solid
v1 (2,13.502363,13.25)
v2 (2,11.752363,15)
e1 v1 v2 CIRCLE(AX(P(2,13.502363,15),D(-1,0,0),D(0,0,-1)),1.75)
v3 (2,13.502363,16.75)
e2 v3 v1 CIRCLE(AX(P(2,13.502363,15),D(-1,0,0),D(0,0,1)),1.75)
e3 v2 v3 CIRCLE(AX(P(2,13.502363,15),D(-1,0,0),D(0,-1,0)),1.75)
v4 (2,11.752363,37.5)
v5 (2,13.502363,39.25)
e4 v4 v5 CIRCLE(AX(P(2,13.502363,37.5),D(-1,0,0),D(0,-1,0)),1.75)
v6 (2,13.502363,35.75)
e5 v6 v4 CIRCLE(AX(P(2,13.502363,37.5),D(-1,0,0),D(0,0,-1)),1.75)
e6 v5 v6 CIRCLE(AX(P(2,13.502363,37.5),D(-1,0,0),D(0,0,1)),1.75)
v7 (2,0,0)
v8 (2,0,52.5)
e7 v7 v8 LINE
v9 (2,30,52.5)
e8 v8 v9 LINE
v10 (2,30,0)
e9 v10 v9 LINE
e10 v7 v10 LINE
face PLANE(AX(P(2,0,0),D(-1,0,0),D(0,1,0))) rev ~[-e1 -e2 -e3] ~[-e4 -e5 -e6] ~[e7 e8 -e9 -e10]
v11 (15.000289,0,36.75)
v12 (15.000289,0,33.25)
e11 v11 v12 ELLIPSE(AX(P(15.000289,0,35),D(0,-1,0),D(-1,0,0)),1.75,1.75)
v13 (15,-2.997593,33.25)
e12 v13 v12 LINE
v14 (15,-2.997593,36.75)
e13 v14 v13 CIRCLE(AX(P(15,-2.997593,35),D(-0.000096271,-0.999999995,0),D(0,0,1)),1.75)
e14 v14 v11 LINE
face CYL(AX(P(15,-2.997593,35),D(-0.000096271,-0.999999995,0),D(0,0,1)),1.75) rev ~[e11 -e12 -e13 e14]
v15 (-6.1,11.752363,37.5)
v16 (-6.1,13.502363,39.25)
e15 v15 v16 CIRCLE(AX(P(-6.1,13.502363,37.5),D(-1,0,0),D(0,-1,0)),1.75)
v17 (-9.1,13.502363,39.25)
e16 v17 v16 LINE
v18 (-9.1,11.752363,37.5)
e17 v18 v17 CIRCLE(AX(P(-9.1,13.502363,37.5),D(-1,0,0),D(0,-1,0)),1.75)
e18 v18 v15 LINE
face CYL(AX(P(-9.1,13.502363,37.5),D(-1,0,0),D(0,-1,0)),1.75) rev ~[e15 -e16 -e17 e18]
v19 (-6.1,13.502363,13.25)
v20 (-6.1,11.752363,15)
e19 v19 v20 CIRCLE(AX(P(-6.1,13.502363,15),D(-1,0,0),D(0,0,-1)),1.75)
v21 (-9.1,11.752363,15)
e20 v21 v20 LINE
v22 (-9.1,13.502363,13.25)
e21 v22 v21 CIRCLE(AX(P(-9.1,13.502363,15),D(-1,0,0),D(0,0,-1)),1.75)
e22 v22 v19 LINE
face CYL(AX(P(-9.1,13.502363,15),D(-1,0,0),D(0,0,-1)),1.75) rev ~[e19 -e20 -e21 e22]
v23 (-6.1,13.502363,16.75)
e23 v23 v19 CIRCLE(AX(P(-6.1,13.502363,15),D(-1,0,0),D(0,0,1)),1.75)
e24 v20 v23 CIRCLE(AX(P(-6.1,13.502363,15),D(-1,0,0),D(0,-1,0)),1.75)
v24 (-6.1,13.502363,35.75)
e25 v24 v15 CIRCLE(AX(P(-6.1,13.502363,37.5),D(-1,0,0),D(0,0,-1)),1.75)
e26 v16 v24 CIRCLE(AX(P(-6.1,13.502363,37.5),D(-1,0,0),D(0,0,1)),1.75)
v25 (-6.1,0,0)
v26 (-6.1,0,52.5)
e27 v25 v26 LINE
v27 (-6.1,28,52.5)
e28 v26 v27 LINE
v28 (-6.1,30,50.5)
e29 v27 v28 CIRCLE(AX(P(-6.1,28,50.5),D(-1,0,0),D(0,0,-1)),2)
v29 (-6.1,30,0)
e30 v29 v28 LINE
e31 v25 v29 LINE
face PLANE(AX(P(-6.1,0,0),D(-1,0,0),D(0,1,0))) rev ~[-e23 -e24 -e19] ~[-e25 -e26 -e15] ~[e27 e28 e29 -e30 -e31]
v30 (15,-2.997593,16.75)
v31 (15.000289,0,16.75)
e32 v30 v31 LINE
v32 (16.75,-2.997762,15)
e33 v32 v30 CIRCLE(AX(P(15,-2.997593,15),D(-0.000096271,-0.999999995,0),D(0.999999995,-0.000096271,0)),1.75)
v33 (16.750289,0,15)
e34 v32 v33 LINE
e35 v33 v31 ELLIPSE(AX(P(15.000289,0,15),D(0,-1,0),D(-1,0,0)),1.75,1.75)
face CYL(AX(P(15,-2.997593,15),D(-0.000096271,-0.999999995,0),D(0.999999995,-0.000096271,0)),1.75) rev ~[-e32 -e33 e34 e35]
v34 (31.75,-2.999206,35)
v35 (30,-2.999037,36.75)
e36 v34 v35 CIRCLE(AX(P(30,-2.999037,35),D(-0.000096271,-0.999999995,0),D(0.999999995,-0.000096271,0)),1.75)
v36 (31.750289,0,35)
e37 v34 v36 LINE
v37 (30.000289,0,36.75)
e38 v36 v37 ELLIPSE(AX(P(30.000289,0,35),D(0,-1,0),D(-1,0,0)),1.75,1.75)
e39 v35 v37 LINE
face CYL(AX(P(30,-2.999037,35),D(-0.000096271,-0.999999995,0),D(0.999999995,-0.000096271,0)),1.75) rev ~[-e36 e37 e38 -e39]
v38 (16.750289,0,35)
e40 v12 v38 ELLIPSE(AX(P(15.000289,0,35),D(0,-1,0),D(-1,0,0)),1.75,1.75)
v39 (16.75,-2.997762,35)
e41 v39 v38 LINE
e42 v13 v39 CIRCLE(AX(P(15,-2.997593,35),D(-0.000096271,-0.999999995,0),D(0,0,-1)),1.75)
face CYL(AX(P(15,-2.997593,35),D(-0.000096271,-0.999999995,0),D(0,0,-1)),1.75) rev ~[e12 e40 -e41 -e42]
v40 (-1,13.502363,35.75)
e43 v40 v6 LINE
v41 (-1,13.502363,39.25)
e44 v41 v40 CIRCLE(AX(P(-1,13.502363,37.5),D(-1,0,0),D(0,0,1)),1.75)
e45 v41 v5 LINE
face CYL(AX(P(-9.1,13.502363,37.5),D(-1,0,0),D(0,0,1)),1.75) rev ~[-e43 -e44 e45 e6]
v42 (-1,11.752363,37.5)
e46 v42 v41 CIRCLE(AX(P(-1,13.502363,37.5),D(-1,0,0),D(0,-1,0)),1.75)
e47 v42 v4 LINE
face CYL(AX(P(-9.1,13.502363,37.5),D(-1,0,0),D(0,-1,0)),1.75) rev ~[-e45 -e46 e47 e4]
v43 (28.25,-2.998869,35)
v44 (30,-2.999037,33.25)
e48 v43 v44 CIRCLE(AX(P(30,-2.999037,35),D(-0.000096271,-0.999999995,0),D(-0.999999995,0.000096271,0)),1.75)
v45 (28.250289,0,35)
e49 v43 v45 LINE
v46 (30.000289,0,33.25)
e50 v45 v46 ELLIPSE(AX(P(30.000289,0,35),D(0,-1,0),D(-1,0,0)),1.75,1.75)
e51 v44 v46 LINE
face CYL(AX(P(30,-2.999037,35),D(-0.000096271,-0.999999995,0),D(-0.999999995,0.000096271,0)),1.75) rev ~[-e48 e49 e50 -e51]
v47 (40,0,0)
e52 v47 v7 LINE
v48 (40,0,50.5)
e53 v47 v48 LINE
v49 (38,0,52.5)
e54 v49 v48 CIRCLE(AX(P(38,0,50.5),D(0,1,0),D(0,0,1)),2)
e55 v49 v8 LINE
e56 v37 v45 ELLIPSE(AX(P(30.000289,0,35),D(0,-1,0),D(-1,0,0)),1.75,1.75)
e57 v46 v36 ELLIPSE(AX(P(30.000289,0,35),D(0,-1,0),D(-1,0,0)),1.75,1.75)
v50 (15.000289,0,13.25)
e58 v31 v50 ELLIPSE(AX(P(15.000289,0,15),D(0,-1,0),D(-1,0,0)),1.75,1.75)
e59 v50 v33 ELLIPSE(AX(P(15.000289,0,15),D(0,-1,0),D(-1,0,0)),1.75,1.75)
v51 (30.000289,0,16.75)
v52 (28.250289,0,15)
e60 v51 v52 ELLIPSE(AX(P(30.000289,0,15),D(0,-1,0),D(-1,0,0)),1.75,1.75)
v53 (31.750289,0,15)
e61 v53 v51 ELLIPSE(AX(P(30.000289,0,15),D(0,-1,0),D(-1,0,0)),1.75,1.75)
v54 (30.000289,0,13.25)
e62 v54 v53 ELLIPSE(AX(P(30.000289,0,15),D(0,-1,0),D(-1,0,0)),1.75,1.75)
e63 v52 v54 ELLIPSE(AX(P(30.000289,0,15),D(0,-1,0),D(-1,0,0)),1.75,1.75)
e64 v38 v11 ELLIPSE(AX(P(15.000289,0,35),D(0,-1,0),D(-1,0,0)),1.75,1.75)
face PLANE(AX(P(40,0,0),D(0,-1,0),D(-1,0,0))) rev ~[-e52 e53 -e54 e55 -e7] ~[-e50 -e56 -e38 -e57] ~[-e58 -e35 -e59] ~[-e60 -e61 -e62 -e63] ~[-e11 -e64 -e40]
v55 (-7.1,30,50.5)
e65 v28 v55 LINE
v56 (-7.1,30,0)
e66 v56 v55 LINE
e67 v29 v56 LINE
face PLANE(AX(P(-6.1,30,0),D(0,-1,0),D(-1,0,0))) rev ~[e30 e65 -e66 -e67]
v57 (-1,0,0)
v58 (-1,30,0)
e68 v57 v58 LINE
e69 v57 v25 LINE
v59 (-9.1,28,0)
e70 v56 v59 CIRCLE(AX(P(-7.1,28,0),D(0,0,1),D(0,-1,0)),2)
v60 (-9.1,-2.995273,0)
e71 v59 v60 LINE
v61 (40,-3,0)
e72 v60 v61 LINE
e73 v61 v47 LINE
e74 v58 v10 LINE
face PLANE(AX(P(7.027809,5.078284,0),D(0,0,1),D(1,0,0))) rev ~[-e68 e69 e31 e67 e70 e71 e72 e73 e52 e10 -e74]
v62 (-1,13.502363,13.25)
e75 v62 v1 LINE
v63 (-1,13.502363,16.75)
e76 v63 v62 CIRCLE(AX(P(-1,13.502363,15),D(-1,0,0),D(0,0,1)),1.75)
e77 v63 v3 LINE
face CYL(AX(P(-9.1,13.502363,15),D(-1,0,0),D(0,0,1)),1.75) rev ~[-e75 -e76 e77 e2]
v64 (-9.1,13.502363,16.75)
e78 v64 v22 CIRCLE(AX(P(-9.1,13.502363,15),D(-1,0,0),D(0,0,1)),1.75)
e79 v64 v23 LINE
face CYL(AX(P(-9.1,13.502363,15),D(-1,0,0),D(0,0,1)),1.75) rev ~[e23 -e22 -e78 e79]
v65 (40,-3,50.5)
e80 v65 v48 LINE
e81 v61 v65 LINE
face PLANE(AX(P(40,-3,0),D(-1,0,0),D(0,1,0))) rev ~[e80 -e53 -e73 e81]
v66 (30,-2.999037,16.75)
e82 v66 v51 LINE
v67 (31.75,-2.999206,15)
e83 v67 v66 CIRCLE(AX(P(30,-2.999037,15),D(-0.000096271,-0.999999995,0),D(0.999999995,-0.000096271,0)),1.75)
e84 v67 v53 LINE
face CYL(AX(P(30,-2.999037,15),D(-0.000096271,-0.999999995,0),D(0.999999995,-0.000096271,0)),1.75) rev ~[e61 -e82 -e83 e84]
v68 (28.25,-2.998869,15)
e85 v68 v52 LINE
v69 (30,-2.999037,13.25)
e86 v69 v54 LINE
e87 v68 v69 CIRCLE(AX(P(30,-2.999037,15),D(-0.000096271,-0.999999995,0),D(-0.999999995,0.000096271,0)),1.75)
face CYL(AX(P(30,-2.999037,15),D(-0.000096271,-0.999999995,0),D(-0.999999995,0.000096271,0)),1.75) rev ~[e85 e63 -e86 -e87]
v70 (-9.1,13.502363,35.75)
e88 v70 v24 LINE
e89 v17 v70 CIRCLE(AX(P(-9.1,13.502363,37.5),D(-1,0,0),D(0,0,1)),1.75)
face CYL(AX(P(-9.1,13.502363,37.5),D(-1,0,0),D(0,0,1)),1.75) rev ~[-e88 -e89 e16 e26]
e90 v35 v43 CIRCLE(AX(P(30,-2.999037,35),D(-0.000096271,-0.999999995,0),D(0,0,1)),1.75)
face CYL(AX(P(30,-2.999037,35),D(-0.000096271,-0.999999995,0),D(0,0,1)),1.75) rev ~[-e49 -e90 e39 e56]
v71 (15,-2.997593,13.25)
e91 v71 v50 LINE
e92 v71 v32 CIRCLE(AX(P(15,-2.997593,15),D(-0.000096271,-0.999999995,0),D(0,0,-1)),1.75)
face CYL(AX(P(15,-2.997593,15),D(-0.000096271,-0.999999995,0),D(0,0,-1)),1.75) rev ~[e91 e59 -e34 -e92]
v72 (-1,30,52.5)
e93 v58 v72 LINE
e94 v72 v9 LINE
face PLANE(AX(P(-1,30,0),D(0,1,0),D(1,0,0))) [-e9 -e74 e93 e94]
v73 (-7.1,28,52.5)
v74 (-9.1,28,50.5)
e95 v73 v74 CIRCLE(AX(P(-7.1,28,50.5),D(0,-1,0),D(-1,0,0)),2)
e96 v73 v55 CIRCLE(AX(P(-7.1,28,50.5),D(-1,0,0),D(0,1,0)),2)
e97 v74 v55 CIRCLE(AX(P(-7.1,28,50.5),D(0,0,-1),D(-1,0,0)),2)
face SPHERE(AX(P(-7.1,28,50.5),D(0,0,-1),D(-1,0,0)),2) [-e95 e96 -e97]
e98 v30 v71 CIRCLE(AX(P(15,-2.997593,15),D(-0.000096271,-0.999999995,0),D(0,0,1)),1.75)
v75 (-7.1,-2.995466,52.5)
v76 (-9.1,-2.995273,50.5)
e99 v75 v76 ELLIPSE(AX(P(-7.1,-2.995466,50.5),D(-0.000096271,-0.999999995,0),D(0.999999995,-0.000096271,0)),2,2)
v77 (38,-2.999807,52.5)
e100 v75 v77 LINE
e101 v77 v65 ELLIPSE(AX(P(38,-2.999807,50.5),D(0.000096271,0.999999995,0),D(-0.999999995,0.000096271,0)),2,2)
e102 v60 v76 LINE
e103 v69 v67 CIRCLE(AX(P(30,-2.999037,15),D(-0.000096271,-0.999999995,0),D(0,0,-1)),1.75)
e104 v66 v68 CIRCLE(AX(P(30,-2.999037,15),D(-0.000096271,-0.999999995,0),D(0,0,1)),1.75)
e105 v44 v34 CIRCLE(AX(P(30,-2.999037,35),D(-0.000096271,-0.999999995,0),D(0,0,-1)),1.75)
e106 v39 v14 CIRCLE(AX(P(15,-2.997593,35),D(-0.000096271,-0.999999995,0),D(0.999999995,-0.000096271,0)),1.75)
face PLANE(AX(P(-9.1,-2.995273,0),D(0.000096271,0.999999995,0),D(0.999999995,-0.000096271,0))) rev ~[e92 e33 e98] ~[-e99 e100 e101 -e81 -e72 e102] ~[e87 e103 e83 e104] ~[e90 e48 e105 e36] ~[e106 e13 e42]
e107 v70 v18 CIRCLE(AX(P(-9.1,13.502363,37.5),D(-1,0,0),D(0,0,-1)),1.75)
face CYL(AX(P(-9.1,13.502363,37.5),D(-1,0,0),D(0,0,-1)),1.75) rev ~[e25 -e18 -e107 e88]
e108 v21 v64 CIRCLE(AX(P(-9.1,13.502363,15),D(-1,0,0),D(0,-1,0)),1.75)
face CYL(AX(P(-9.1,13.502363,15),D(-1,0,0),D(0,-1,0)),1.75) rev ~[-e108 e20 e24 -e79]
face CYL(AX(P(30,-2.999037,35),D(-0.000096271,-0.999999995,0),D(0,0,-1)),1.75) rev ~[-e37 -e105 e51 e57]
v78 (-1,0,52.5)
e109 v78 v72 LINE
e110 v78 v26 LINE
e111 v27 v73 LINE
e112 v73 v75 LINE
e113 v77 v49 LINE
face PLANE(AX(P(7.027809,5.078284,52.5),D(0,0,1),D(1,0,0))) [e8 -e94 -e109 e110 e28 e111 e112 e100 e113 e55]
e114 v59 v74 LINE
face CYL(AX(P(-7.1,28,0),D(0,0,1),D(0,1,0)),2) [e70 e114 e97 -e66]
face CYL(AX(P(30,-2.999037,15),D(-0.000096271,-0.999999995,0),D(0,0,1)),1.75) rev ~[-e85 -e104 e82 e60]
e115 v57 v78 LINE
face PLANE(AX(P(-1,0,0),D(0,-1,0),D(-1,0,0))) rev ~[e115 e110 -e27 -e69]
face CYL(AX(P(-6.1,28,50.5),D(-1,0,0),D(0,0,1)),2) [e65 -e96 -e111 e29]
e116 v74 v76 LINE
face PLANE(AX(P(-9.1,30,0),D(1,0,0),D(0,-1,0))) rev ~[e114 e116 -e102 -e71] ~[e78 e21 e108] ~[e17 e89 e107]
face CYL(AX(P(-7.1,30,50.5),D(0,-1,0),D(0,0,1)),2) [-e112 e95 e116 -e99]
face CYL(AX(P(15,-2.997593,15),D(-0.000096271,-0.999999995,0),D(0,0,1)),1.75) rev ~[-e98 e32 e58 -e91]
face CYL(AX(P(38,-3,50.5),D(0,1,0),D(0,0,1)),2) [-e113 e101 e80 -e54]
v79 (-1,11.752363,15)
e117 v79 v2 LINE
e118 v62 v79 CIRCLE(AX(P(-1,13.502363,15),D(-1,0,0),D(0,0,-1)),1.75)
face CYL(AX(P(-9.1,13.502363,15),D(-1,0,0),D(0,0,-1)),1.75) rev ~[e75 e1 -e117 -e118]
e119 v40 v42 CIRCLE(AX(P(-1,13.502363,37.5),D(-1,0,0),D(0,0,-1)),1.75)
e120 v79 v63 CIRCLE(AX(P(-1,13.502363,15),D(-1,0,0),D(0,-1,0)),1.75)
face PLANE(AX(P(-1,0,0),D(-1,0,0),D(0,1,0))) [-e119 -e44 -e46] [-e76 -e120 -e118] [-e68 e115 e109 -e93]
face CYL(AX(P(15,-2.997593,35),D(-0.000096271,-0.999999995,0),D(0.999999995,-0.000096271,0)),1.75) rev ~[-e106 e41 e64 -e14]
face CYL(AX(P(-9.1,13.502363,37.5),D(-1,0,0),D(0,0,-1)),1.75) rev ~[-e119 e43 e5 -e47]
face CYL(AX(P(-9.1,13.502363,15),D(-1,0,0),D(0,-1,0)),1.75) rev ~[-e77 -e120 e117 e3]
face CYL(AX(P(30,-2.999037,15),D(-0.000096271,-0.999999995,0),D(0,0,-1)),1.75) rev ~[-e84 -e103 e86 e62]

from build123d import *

# Parameters (mm, degrees)
F0_W     = 3
F0_H     = 30
F1_DEPTH = 52.5
F3_DEPTH = 25
F4_R     = 2
F6_DEPTH = 25


# Not quite as in the source:
# - a feature names something its author has since deleted; it is built from what else it names


with BuildPart() as f1:
    # F0 (on Top) → F1 (new body)
    with BuildSketch(Plane.XY):
        Polygon((2, 0), (-1, 0), (-6.1, 0), (-6.1, 30), (-9.1, 30), (-9.1, -2.9952730983), (40, -3), (40, 0), align=None)
        with Locations((0.5, 15)):
            Rectangle(F0_W, F0_H)
    extrude(amount=F1_DEPTH)

    # F2 (on face) → F3 (cut)
    with BuildSketch(Plane(origin=(-9.1, 0, 0), x_dir=(0, -1, 0), z_dir=(-1, 0, 0))):
        with BuildLine():
            Line((-13.5023634508, 37.5), (-13.5023634508, 39.25))
            ThreePointArc((-13.5023634508, 39.25), (-15.2523634508, 37.5), (-13.5023634508, 35.75))
            Line((-13.5023634508, 35.75), (-13.5023634508, 37.5))
        make_face()
        with BuildLine():
            ThreePointArc((-11.7523634508, 37.5), (-12.2649265837, 38.7374368671), (-13.5023634508, 39.25))
            Line((-13.5023634508, 39.25), (-13.5023634508, 37.5))
            Line((-13.5023634508, 37.5), (-13.5023634508, 35.75))
            ThreePointArc((-13.5023634508, 35.75), (-12.2649265837, 36.2625631329), (-11.7523634508, 37.5))
        make_face()
        with BuildLine():
            Line((-13.5023634508, 15), (-13.5023634508, 13.25))
            ThreePointArc((-13.5023634508, 13.25), (-12.2649265837, 13.7625631329), (-11.7523634508, 15))
            ThreePointArc((-11.7523634508, 15), (-12.2649265837, 16.2374368671), (-13.5023634508, 16.75))
            Line((-13.5023634508, 16.75), (-13.5023634508, 15))
        make_face()
        with BuildLine():
            ThreePointArc((-13.5023634508, 16.75), (-15.2523634508, 15), (-13.5023634508, 13.25))
            Line((-13.5023634508, 13.25), (-13.5023634508, 15))
            Line((-13.5023634508, 15), (-13.5023634508, 16.75))
        make_face()
    extrude(amount=-F3_DEPTH, mode=Mode.SUBTRACT)

    # F4
    f4_edges = [f1.edges().sort_by_distance(p)[0] for p in [
        (40, -1.5, 52.5),
        (-9.1, 30, 26.25),
        (-9.1, 13.502363, 52.5),
        (-7.6, 30, 52.5),
    ]]
    fillet(f4_edges, radius=F4_R)

    # F5 (on face) → F6 (cut)
    with BuildSketch(Plane(origin=(-0.000288442, -2.9961491359, 0), x_dir=(0.9999999954, -9.62709e-05, 0), z_dir=(-9.62709e-05, -0.9999999954, 0))):
        with BuildLine():
            Line((15.0002886274, 35), (15.0002886274, 33.25))
            ThreePointArc((15.0002886274, 33.25), (16.2377254944, 33.7625631329), (16.7502886274, 35))
            Line((16.7502886274, 35), (15.0002886274, 35))
        make_face()
        with BuildLine():
            ThreePointArc((15.0002886274, 36.75), (13.2502886274, 35), (15.0002886274, 33.25))
            Line((15.0002886274, 33.25), (15.0002886274, 35))
            Line((15.0002886274, 35), (15.0002886274, 36.75))
        make_face()
        with BuildLine():
            Line((15.0002886274, 36.75), (15.0002886274, 35))
            Line((15.0002886274, 35), (16.7502886274, 35))
            ThreePointArc((16.7502886274, 35), (16.2377254944, 36.2374368671), (15.0002886274, 36.75))
        make_face()
        with BuildLine():
            Line((30.0002886274, 35), (31.7502886274, 35))
            ThreePointArc((31.7502886274, 35), (31.2377254944, 36.2374368671), (30.0002886274, 36.75))
            Line((30.0002886274, 36.75), (30.0002886274, 35))
        make_face()
        with BuildLine():
            Line((28.2502886274, 35), (30.0002886274, 35))
            Line((30.0002886274, 35), (30.0002886274, 36.75))
            ThreePointArc((30.0002886274, 36.75), (28.7628517603, 36.2374368671), (28.2502886274, 35))
        make_face()
        with BuildLine():
            Line((30.0002886274, 33.25), (30.0002886274, 35))
            Line((30.0002886274, 35), (28.2502886274, 35))
            ThreePointArc((28.2502886274, 35), (28.7628517603, 33.7625631329), (30.0002886274, 33.25))
        make_face()
        with BuildLine():
            ThreePointArc((30.0002886274, 33.25), (31.2377254944, 33.7625631329), (31.7502886274, 35))
            Line((31.7502886274, 35), (30.0002886274, 35))
            Line((30.0002886274, 35), (30.0002886274, 33.25))
        make_face()
        with BuildLine():
            Line((30.0002886274, 15), (31.7502886274, 15))
            ThreePointArc((31.7502886274, 15), (31.2377254944, 16.2374368671), (30.0002886274, 16.75))
            Line((30.0002886274, 16.75), (30.0002886274, 15))
        make_face()
        with BuildLine():
            Line((28.2502886274, 15), (30.0002886274, 15))
            Line((30.0002886274, 15), (30.0002886274, 16.75))
            ThreePointArc((30.0002886274, 16.75), (28.7628517603, 16.2374368671), (28.2502886274, 15))
        make_face()
        with BuildLine():
            ThreePointArc((28.2502886274, 15), (28.7628517603, 13.7625631329), (30.0002886274, 13.25))
            Line((30.0002886274, 13.25), (30.0002886274, 15))
            Line((30.0002886274, 15), (28.2502886274, 15))
        make_face()
        with BuildLine():
            Line((30.0002886274, 15), (30.0002886274, 13.25))
            ThreePointArc((30.0002886274, 13.25), (31.2377254944, 13.7625631329), (31.7502886274, 15))
            Line((31.7502886274, 15), (30.0002886274, 15))
        make_face()
        with BuildLine():
            Line((15.0002886274, 15), (15.0002886274, 13.25))
            ThreePointArc((15.0002886274, 13.25), (16.2377254944, 13.7625631329), (16.7502886274, 15))
            Line((16.7502886274, 15), (15.0002886274, 15))
        make_face()
        with BuildLine():
            Line((15.0002886274, 16.75), (15.0002886274, 15))
            Line((15.0002886274, 15), (16.7502886274, 15))
            ThreePointArc((16.7502886274, 15), (16.2377254944, 16.2374368671), (15.0002886274, 16.75))
        make_face()
        with BuildLine():
            ThreePointArc((15.0002886274, 16.75), (13.2502886274, 15), (15.0002886274, 13.25))
            Line((15.0002886274, 13.25), (15.0002886274, 15))
            Line((15.0002886274, 15), (15.0002886274, 16.75))
        make_face()
    extrude(amount=-F6_DEPTH, mode=Mode.SUBTRACT)


solid = f1.part
